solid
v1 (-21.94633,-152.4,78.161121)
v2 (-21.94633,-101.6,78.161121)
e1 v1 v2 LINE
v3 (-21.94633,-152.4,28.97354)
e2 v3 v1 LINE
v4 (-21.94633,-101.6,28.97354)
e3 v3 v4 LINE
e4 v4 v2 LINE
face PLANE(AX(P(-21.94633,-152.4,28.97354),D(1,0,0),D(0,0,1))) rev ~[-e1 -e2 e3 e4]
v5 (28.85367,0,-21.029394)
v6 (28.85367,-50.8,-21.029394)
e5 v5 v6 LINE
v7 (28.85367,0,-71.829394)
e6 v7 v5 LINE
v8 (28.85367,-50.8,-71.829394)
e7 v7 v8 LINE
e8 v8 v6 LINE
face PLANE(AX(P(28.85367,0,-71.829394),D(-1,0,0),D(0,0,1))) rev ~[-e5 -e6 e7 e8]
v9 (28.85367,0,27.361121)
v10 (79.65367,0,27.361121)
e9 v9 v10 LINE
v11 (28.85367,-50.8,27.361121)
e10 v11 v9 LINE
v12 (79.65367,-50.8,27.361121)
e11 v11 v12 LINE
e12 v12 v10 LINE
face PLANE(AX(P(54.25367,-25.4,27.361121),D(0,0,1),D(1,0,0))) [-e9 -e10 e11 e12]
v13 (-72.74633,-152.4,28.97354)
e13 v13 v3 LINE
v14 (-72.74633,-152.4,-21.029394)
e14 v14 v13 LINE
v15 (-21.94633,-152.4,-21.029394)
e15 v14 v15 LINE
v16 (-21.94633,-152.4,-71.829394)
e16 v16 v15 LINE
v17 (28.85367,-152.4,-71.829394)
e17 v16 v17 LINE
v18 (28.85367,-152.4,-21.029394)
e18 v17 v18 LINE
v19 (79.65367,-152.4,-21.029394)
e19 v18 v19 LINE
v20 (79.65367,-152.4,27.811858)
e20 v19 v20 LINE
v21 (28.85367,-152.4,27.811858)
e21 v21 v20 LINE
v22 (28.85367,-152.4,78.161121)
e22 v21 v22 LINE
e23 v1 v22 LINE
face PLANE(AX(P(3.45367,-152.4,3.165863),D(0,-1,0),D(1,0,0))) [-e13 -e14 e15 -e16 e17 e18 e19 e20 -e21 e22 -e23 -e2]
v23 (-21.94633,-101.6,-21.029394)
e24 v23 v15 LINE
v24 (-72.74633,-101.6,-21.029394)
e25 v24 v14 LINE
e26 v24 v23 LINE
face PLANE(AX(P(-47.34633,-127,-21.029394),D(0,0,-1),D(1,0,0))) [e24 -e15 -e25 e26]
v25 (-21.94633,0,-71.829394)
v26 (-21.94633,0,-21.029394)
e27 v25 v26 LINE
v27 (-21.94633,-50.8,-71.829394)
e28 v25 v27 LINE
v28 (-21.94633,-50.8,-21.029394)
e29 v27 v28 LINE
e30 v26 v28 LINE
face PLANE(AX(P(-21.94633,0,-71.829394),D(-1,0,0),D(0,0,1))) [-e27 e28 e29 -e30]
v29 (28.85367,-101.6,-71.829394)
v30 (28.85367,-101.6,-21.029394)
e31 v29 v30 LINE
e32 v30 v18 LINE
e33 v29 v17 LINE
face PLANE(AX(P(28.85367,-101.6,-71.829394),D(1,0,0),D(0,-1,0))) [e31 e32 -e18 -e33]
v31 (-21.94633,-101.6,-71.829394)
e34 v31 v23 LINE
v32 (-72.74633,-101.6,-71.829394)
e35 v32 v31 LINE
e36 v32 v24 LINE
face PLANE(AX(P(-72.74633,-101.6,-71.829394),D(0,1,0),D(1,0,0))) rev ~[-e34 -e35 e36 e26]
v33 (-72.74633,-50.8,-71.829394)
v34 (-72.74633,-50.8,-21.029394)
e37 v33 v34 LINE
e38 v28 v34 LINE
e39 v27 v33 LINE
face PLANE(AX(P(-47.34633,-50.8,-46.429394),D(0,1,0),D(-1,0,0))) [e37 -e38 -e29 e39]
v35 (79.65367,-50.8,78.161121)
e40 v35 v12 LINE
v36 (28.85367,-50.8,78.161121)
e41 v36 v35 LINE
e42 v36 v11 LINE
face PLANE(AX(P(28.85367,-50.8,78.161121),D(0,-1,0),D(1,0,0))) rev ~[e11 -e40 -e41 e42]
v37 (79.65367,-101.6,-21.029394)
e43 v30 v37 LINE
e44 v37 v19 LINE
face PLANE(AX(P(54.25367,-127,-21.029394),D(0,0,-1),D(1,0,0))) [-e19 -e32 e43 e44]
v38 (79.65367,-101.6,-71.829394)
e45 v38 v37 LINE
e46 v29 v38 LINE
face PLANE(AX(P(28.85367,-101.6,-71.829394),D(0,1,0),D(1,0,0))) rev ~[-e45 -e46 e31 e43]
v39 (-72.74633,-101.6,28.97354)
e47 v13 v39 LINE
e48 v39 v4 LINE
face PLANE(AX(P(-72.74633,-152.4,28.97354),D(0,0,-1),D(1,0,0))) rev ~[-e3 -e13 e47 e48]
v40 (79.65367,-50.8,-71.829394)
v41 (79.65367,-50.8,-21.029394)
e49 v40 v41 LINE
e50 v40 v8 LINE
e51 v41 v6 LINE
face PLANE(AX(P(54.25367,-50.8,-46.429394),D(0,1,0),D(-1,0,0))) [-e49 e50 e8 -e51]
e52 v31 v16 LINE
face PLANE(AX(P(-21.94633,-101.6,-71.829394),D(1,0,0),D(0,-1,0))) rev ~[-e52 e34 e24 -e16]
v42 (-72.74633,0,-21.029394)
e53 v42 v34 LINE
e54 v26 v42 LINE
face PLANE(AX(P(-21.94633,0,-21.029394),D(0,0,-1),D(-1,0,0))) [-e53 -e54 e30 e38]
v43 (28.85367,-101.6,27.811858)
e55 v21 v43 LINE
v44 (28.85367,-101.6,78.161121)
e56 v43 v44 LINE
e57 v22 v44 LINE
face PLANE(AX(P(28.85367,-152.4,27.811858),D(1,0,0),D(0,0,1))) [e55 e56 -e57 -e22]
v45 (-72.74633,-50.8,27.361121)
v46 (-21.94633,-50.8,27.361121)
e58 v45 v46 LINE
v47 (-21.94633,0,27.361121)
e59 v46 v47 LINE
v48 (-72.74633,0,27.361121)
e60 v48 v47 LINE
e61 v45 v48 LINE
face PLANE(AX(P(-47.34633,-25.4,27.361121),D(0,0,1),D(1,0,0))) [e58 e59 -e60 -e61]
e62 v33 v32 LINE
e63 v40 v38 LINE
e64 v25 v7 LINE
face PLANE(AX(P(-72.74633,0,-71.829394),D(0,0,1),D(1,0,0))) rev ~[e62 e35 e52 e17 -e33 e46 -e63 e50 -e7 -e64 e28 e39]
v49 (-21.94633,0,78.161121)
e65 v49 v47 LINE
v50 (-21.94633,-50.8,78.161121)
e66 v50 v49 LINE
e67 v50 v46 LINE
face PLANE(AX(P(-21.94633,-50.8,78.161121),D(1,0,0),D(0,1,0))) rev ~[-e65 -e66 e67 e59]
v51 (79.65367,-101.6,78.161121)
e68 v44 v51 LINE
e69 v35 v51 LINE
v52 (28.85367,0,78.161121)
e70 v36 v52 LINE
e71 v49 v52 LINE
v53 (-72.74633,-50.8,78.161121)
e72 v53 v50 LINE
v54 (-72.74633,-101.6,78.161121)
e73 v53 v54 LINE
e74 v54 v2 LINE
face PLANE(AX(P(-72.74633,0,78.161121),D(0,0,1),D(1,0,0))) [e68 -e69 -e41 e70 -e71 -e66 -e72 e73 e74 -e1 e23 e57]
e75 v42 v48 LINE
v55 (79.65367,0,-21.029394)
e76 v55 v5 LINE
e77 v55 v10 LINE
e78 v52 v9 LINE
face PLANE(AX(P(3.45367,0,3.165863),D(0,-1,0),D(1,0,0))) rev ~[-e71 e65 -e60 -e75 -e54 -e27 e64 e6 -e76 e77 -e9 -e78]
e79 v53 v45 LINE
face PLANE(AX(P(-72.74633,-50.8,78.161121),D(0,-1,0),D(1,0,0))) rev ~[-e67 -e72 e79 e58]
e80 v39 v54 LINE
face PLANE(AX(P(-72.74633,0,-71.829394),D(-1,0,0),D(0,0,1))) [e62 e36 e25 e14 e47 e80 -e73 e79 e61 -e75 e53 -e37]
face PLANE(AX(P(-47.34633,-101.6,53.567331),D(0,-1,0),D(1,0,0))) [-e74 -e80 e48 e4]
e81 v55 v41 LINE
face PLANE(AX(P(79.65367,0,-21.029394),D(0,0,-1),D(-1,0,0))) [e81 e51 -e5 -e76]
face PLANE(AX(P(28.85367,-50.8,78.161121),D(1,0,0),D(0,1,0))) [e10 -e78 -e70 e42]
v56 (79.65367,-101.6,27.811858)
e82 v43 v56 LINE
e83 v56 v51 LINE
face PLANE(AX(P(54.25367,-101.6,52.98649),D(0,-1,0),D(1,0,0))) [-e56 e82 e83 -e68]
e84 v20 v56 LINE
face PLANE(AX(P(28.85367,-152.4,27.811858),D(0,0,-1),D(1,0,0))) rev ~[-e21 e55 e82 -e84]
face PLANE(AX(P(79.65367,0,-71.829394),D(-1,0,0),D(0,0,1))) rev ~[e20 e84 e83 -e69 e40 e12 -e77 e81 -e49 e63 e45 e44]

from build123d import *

# Parameters (mm, degrees)
F0_W      = 152.4
F0_H      = 149.9905144195
F1_DEPTH  = 152.4
F2_W      = 50.8
F2_H      = 49.1875803169
F3_DEPTH  = 50.8
F4_W      = 50.8
F4_H      = 50.3492622576
F5_DEPTH  = 50.8
F6_W      = 50.8
F6_H      = 50.8
F7_DEPTH  = 343
F8_W      = 50.8
F8_H      = 50.8
F9_DEPTH  = 50.8
F10_W     = 50.8
F10_H     = 50.8
F11_DEPTH = 50.8
F12_W     = 50.8
F12_H     = 50.8
F13_DEPTH = 50.8


# Not quite as in the source:
# - an extrude ends at something that could not be found from the text; its depth is read off the source's solid
# - a feature names something its author has since deleted; it is built from what else it names


with BuildPart() as f1:
    # F0 (on Front) → F1 (new body)
    with BuildSketch(Plane.XZ):
        with Locations((3.4536700696, 3.1658634543)):
            Rectangle(F0_W, F0_H)
    extrude(amount=F1_DEPTH)

    # F2 (on face) → F3 (cut)
    with BuildSketch(Plane.XZ.offset(152.4)):
        with Locations((-47.3463299304, 53.5673305057)):
            Rectangle(F2_W, F2_H)
    extrude(amount=-F3_DEPTH, mode=Mode.SUBTRACT)

    # F4 (on face) → F5 (cut)
    with BuildSketch(Plane.XZ.offset(152.4)):
        with Locations((54.2536700696, 52.9864895353)):
            Rectangle(F4_W, F4_H)
    extrude(amount=-F5_DEPTH, mode=Mode.SUBTRACT)

    # F6 (on face) → F7 (cut, through all)
    with BuildSketch(Plane.XZ.offset(152.4)):
        with Locations((-47.3463299304, -46.4293937554)):
            Rectangle(F6_W, F6_H)
    extrude(amount=F7_DEPTH, mode=Mode.SUBTRACT)

    # F8 (on face) → F9 (cut)
    with BuildSketch(Plane(origin=(0, 0, 0), x_dir=(-1, 0, 0), z_dir=(0, 1, 0))):
        with Locations((-54.2536700696, -46.4293937554)):
            Rectangle(F8_W, F8_H)
        with Locations((47.3463299304, -46.4293937554)):
            Rectangle(F8_W, F8_H)
    extrude(amount=-F9_DEPTH, mode=Mode.SUBTRACT)

    # F10 (on face) → F11 (cut)
    with BuildSketch(Plane(origin=(0, 0, -71.8293937554), x_dir=(1, 0, 0), z_dir=(0, 0, -1))):
        with Locations((-47.3463299304, 127)):
            Rectangle(F10_W, F10_H)
        with Locations((54.2536700696, 127)):
            Rectangle(F10_W, F10_H)
    extrude(amount=-F11_DEPTH, mode=Mode.SUBTRACT)

    # F12 (on face) → F13 (cut)
    with BuildSketch(Plane.XY.offset(78.1611206641)):
        with Locations((-47.3463299304, -25.4)):
            Rectangle(F12_W, F12_H)
        with Locations((54.2536700696, -25.4)):
            Rectangle(F12_W, F12_H)
    extrude(amount=-F13_DEPTH, mode=Mode.SUBTRACT)


solid = f1.part
